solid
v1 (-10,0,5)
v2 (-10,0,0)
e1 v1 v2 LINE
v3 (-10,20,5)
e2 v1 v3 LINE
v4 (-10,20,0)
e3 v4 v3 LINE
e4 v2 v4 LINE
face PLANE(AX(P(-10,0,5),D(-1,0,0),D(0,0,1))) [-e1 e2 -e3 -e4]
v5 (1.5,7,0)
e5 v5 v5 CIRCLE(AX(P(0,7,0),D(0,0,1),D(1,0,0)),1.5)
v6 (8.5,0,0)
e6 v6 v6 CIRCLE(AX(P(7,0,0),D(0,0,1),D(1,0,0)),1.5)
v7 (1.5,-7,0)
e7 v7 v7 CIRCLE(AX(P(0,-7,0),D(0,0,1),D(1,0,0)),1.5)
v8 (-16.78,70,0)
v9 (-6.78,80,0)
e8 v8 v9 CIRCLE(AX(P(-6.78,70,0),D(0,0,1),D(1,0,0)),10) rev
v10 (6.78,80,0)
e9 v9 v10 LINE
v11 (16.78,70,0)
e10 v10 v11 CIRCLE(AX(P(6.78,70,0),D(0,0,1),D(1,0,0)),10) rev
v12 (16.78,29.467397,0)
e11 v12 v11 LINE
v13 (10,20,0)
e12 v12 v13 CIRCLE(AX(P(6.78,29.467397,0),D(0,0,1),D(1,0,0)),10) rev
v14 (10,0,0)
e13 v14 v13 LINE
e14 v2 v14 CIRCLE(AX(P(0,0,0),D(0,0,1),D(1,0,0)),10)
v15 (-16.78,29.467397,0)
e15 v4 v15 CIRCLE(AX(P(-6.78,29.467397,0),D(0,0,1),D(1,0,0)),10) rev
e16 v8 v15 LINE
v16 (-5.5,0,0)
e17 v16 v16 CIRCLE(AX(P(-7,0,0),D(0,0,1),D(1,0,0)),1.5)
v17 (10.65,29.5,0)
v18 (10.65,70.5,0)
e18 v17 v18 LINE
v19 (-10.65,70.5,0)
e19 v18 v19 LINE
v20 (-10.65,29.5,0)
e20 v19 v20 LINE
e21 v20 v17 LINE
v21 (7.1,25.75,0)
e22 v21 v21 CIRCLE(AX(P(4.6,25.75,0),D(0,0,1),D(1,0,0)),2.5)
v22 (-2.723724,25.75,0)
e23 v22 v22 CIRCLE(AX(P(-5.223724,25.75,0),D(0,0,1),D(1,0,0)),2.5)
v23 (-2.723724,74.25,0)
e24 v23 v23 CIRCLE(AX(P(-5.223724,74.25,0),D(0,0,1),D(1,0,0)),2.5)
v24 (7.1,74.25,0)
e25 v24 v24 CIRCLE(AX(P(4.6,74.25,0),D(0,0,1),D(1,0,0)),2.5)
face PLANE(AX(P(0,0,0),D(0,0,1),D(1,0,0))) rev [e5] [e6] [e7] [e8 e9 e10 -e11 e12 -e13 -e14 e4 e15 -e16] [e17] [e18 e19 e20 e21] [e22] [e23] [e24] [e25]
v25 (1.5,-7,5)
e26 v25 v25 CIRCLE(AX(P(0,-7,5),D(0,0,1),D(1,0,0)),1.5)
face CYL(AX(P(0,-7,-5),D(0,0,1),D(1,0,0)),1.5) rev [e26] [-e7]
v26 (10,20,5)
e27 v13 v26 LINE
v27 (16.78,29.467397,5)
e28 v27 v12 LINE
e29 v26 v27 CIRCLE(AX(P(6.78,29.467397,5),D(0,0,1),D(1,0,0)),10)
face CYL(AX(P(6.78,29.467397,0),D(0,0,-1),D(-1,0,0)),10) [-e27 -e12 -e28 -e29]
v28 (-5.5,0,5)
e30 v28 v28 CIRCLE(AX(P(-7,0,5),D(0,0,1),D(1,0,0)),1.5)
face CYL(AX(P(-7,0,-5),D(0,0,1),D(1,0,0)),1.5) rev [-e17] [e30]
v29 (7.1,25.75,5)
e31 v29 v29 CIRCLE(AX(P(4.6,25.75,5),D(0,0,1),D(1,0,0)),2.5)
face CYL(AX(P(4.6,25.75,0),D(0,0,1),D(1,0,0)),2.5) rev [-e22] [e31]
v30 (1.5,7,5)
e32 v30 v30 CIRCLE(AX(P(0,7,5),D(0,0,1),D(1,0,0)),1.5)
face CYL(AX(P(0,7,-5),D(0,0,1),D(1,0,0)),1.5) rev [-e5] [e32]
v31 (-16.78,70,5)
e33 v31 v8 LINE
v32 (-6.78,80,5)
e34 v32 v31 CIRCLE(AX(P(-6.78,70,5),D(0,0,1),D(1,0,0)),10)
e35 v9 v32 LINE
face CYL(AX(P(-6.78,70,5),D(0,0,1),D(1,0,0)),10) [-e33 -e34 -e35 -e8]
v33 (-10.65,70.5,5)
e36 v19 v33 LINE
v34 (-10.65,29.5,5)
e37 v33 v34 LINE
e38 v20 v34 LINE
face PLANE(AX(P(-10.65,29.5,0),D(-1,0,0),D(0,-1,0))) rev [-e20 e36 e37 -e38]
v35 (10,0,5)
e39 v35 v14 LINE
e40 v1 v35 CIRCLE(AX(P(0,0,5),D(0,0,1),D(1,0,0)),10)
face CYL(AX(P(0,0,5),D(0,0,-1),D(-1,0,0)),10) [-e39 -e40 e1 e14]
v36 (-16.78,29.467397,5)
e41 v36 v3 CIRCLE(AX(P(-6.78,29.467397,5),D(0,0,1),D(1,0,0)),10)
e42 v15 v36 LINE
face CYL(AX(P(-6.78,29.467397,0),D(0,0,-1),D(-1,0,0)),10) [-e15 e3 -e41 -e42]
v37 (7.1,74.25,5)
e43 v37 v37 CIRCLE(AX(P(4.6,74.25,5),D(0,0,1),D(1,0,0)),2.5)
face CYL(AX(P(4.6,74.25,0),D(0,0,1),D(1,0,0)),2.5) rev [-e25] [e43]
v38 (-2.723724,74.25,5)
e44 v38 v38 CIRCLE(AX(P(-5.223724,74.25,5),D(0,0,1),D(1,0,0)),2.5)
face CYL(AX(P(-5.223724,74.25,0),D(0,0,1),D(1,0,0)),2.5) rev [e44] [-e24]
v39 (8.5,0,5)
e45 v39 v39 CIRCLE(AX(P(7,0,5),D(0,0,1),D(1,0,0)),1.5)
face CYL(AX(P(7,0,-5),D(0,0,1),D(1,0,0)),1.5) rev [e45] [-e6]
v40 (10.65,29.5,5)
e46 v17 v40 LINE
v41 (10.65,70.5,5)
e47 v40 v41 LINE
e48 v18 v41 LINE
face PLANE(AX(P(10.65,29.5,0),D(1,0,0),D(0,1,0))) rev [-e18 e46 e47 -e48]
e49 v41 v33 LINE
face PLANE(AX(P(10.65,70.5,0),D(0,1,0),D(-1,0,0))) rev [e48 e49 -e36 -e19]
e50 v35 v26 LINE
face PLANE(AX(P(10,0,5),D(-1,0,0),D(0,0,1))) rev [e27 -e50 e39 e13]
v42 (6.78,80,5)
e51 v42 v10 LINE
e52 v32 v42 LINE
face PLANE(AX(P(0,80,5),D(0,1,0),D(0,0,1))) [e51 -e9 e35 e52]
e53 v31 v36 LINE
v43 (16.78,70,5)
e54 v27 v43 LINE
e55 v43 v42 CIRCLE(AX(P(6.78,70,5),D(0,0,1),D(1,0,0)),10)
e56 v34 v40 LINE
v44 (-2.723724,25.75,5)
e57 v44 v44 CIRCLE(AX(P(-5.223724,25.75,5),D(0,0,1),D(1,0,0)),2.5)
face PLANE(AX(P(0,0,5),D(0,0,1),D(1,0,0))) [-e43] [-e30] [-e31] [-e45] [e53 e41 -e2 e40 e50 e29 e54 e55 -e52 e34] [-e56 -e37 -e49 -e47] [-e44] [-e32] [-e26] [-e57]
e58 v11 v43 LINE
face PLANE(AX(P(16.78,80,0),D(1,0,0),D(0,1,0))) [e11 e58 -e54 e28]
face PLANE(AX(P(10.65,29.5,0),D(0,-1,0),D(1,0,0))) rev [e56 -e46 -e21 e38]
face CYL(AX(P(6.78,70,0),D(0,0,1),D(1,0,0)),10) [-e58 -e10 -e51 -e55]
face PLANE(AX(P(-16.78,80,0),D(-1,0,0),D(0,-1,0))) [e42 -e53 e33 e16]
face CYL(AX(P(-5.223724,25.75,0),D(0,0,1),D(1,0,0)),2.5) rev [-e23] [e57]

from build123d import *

# Parameters (mm, degrees)
BOSS_EXTRUDE1_DEPTH = 5
SKETCH2_R           = 1.5
CUT_EXTRUDE1_DEPTH  = 10
SKETCH4_W           = 33.56
SKETCH4_H           = 60
BOSS_EXTRUDE2_DEPTH = 5
FILLET1_R           = 10
SKETCH3_R           = 2.5
SKETCH3_W           = 21.3
SKETCH3_H           = 41
CUT_EXTRUDE2_DEPTH  = 5


with BuildPart() as part:
    # Sketch1 → Boss-Extrude1 (new body)
    with BuildSketch(Plane.XY):
        with BuildLine():
            Line((10, 0), (10, 80))
            Line((10, 80), (-10, 80))
            Line((-10, 80), (-10, 0))
            ThreePointArc((-10, 0), (0, -10), (10, 0))
        make_face()
    extrude(amount=BOSS_EXTRUDE1_DEPTH)

    # Sketch2 → Cut-Extrude1 (cut)
    with BuildSketch(Plane.XY.offset(5)):
        with Locations((0, 7)):
            Circle(SKETCH2_R)
        with Locations((7, 0)):
            Circle(SKETCH2_R)
        with Locations((0, -7)):
            Circle(SKETCH2_R)
        with Locations((-7, 0)):
            Circle(SKETCH2_R)
    extrude(amount=-CUT_EXTRUDE1_DEPTH, mode=Mode.SUBTRACT)

    # Sketch4 → Boss-Extrude2 (add)
    with BuildSketch(Plane.XY.offset(5)):
        with Locations((0, 50)):
            Rectangle(SKETCH4_W, SKETCH4_H)
    extrude(amount=-BOSS_EXTRUDE2_DEPTH)

    # Fillet1
    # the kernel refuses this fillet: 10 mm, written as the material it takes off along each edge
    with BuildSketch(Plane(origin=(16.78, 80, 30), x_dir=(-1, 0, 0), z_dir=(0, 0, -1)), Plane(origin=(-16.78, 80, 30), x_dir=(0, -1, 0), z_dir=(0, 0, -1))) as fillet1_piece_1:
        with BuildLine():
            CenterArc((FILLET1_R, -FILLET1_R), FILLET1_R, 90, 90)
            Line((0, -FILLET1_R), (-FILLET1_R * 0.02, -FILLET1_R))
            Line((-FILLET1_R * 0.02, -FILLET1_R), (-FILLET1_R * 0.02, FILLET1_R * 0.02))
            Line((-FILLET1_R * 0.02, FILLET1_R * 0.02), (FILLET1_R, FILLET1_R * 0.02))
            Line((FILLET1_R, FILLET1_R * 0.02), (FILLET1_R, 0))
        make_face()
    extrude(amount=55, mode=Mode.SUBTRACT)
    with BuildSketch(Plane(origin=(16.78, 20, 28.668491714), x_dir=(0, 1, 0), z_dir=(0, 0, -1))) as fillet1_piece_2:
        with BuildLine():
            CenterArc((9.467396685, -10), FILLET1_R, 90, 71.216080389)
            Line((0, -6.78), (-0.189347934, -6.7156))
            ThreePointArc((-0.189347934, -6.7156), (-0.2, -3.39), (-0.2, 0))
            Line((-0.2, 0), (0, 0.2))
            Line((0, 0.2), (9.467396685, 0.2))
            Line((9.467396685, 0.2), (9.467396685, 0))
        make_face()
    extrude(amount=52.336983427, mode=Mode.SUBTRACT)
    with BuildSketch(Plane(origin=(-16.78, 20, 28.668491714), x_dir=(1, 0, 0), z_dir=(0, 0, -1))) as fillet1_piece_3:
        with BuildLine():
            CenterArc((10, -9.467396685), FILLET1_R, 108.783919611, 71.216080389)
            Line((0, -9.467396685), (-0.2, -9.467396685))
            Line((-0.2, -9.467396685), (-0.2, 0))
            Line((-0.2, 0), (0, 0.2))
            ThreePointArc((0, 0.2), (3.39, 0.2), (6.7156, 0.189347934))
            Line((6.7156, 0.189347934), (6.78, 0))
        make_face()
    extrude(amount=52.336983427, mode=Mode.SUBTRACT)

    # Sketch3 → Cut-Extrude2 (cut)
    with BuildSketch(Plane.XY.offset(5)):
        with Locations((4.6, 74.25)):
            Circle(SKETCH3_R)
        with Locations((-5.22372371, 74.25)):
            Circle(SKETCH3_R)
        with Locations((-5.22372371, 25.75)):
            Circle(SKETCH3_R)
        with Locations((4.6, 25.75)):
            Circle(SKETCH3_R)
        with Locations((0, 50)):
            Rectangle(SKETCH3_W, SKETCH3_H)
    extrude(amount=-CUT_EXTRUDE2_DEPTH, mode=Mode.SUBTRACT)


solid = part.part
